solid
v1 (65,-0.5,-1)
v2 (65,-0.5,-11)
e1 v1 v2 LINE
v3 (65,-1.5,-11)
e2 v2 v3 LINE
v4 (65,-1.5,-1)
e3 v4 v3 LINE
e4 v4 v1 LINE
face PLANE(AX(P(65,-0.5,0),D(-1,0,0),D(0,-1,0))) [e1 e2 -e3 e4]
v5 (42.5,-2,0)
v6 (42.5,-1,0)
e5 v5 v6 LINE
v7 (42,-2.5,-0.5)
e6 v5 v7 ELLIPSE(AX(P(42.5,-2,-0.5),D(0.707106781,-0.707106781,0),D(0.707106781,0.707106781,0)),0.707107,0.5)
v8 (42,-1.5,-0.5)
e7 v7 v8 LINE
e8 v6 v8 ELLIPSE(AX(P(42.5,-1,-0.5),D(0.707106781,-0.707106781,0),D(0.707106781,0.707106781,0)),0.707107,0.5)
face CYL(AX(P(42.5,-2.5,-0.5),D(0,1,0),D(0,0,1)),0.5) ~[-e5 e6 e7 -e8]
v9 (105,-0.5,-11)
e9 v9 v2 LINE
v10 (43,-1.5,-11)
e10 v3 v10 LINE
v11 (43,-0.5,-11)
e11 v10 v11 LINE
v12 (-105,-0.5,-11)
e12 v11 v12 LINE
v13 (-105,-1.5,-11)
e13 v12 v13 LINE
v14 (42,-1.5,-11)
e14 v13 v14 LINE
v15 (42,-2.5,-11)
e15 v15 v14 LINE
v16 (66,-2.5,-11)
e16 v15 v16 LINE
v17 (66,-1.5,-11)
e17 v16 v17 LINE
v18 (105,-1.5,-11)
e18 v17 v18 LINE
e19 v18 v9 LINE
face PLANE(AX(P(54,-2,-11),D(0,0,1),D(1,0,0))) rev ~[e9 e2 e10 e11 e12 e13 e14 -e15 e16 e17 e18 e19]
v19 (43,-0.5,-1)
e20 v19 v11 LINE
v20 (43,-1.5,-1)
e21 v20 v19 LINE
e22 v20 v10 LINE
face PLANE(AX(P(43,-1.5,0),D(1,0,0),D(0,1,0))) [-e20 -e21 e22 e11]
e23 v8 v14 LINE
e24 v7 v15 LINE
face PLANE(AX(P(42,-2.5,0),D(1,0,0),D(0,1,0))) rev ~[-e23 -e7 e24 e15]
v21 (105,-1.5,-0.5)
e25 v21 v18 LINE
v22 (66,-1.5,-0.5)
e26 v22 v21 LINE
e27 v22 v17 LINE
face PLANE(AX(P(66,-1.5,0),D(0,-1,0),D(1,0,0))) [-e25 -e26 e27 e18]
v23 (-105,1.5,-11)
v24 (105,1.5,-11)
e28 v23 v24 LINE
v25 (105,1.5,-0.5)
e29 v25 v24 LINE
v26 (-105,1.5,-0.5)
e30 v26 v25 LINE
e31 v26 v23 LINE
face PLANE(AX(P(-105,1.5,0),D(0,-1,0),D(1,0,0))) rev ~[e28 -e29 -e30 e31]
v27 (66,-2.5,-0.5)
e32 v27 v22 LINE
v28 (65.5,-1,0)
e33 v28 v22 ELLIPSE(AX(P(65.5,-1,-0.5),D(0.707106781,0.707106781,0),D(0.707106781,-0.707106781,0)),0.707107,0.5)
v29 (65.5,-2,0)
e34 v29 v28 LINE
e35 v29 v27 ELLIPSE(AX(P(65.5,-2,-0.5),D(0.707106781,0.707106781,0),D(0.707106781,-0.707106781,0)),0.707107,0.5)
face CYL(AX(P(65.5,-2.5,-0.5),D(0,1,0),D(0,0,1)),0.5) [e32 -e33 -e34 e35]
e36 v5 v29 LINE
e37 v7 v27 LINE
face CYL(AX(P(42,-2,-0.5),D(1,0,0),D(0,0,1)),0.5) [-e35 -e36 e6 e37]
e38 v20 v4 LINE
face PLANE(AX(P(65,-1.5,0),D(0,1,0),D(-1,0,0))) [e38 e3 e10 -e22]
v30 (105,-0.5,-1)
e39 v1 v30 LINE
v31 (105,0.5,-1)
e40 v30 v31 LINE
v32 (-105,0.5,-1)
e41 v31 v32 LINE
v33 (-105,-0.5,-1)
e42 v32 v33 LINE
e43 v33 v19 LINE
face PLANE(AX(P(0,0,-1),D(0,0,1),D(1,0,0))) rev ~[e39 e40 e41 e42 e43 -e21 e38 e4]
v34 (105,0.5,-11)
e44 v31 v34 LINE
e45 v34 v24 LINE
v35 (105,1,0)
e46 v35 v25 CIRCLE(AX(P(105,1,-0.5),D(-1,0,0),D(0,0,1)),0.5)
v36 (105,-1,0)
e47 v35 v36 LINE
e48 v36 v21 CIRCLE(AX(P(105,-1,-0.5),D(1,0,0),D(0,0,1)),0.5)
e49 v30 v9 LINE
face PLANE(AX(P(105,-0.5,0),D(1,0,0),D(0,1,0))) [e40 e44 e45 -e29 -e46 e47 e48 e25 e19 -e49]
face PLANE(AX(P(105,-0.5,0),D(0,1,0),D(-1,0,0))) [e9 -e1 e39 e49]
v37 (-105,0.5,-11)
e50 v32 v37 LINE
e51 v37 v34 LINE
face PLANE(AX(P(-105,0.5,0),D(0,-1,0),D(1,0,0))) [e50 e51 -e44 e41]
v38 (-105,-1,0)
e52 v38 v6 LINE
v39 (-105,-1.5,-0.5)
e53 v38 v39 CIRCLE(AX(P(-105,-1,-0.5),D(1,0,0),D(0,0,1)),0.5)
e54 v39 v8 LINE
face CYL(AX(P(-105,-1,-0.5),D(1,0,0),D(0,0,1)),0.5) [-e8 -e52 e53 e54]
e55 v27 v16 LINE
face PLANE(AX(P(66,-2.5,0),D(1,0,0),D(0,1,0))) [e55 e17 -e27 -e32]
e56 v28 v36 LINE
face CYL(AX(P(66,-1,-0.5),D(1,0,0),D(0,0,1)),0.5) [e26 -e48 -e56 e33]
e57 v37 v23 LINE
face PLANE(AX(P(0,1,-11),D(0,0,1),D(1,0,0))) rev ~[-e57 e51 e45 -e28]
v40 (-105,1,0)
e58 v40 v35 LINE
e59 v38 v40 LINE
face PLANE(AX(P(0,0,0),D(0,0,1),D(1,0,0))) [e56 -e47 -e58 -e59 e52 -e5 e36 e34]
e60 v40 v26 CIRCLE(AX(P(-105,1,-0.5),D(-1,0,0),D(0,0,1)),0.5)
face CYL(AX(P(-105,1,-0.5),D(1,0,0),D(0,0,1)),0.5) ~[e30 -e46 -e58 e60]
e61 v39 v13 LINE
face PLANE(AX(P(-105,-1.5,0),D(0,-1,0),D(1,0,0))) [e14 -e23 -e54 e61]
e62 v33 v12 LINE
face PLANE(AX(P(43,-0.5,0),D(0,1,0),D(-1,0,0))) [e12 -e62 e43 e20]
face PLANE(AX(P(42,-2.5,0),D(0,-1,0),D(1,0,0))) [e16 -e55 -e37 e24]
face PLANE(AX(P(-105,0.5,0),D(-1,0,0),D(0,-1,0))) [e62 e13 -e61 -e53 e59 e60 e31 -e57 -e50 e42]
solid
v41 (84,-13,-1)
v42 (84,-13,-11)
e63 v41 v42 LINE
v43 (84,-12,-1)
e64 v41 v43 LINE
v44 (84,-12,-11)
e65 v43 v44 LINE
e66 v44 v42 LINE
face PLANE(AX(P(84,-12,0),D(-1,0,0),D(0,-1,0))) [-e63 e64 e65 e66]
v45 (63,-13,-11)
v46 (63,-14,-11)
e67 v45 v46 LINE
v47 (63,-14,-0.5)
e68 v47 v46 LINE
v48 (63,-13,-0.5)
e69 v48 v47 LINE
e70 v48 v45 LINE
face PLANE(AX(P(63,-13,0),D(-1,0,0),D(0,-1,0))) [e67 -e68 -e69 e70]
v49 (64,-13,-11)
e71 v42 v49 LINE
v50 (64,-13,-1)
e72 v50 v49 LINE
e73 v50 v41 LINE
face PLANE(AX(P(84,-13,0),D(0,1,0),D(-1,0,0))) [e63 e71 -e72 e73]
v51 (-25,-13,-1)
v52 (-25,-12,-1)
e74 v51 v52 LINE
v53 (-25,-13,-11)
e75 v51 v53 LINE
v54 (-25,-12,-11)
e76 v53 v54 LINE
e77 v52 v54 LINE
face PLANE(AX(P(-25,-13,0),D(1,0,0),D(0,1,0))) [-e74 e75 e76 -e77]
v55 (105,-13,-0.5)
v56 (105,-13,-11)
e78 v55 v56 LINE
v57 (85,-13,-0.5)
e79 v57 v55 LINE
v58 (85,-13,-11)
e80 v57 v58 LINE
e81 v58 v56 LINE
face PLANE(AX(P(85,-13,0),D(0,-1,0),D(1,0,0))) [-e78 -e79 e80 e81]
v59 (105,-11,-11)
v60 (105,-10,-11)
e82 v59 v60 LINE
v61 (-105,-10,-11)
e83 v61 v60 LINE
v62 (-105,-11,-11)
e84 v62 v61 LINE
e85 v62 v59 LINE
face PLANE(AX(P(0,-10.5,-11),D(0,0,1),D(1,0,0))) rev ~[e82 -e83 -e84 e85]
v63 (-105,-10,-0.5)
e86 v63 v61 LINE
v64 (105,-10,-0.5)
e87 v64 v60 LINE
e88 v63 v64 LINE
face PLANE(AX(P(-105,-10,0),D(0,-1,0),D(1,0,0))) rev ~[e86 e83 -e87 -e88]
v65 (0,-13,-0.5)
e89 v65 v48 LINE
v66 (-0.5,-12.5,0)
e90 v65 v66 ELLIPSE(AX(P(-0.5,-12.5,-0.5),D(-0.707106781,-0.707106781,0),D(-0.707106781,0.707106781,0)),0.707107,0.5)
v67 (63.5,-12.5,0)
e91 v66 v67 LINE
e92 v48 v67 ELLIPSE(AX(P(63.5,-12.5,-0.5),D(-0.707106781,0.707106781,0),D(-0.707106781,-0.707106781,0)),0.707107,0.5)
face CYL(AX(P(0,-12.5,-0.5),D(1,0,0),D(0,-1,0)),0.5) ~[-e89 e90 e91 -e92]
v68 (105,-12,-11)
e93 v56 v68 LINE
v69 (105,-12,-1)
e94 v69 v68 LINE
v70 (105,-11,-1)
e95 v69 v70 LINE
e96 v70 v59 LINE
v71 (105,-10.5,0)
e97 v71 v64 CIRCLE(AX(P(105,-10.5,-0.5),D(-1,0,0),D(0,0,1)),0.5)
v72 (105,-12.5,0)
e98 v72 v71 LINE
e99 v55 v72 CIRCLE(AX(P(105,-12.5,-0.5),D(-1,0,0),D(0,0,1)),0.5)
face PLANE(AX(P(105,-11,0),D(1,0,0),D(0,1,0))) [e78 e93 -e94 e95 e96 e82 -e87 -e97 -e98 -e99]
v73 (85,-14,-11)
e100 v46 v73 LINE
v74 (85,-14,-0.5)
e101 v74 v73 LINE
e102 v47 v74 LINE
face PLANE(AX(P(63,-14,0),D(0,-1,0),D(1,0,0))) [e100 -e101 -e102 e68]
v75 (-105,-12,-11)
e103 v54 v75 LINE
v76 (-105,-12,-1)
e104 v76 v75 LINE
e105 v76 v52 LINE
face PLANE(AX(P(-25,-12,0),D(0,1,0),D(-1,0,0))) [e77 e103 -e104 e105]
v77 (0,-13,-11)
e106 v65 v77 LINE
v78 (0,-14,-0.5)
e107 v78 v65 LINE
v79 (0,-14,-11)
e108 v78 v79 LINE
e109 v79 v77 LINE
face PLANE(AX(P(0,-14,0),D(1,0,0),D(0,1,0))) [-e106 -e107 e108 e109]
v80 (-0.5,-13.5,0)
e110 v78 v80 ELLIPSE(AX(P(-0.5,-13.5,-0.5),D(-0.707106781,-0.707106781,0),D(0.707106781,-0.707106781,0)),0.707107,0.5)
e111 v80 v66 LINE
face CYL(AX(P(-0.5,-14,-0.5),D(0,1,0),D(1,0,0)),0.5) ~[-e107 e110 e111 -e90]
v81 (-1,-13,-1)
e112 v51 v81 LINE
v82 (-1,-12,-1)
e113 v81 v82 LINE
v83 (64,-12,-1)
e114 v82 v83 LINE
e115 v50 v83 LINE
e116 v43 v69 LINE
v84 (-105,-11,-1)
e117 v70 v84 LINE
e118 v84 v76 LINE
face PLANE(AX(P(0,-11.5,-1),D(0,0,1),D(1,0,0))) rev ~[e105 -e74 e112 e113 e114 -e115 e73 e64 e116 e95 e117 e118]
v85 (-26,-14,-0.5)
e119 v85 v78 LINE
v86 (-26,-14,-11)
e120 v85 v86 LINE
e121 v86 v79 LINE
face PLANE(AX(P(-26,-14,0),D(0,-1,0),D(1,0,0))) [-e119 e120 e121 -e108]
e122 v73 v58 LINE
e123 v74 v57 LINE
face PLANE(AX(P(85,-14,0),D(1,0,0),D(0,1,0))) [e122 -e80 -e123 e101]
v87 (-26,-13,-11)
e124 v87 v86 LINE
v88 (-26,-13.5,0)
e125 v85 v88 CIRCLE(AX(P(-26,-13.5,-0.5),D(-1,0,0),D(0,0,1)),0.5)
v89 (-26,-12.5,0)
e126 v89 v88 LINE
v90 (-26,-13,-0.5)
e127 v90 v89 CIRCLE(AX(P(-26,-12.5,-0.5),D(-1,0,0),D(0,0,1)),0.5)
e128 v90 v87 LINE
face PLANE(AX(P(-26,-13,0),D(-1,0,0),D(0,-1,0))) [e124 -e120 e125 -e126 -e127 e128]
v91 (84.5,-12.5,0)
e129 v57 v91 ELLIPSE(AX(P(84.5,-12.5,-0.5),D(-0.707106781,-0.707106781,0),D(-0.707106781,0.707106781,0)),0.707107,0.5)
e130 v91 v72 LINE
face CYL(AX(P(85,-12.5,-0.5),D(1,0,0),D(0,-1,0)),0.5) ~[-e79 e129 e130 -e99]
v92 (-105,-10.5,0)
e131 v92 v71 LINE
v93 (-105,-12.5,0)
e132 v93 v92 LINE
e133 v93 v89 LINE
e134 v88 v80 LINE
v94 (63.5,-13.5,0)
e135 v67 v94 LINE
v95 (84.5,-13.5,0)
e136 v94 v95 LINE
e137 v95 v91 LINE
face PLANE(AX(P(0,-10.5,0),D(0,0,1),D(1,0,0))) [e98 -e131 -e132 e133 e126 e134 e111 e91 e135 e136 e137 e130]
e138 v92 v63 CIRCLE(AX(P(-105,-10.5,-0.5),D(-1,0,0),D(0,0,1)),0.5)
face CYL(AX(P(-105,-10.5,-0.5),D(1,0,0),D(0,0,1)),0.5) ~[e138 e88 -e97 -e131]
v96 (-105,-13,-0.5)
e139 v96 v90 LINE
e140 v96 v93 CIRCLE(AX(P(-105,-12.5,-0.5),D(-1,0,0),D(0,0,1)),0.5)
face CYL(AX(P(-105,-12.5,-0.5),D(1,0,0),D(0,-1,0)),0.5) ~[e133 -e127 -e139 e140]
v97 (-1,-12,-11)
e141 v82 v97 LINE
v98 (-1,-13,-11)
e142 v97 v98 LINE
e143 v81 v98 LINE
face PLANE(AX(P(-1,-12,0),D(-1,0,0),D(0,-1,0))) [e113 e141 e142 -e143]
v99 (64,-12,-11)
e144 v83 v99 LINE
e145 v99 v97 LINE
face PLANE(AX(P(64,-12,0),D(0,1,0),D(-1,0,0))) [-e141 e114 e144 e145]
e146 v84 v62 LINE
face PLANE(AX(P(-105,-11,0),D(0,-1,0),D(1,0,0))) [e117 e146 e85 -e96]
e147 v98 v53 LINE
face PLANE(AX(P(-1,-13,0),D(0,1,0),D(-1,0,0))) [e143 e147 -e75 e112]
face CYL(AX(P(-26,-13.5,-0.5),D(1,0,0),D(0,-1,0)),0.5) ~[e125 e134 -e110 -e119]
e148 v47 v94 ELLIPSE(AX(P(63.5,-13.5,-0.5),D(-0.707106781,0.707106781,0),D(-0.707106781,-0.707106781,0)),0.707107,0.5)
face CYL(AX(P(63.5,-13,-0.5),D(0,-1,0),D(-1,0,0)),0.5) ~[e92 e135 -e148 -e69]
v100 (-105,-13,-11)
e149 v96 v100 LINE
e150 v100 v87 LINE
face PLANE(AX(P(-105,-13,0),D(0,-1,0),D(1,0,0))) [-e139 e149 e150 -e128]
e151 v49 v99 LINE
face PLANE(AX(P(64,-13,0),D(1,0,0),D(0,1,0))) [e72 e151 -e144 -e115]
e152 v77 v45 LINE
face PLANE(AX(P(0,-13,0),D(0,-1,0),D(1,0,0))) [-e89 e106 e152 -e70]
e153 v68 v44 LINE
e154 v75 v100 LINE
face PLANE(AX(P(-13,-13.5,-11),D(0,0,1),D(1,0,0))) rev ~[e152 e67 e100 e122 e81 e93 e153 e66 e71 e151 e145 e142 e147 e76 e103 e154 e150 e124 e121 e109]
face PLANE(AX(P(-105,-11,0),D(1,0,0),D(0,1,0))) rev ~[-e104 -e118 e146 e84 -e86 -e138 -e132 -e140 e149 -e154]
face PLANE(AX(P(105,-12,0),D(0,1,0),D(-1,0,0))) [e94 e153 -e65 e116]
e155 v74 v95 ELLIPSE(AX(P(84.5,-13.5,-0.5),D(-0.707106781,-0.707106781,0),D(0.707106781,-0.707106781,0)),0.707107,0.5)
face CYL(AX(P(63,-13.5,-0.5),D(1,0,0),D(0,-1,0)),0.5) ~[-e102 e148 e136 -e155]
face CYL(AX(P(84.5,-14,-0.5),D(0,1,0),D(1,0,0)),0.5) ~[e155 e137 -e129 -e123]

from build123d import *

# Parameters (mm, degrees)
F1_W     = 20
F1_H     = 1
F1_W_2   = 24
F2_DEPTH = 1
F1_W_3   = 210
F3_DEPTH = 11
F0_W     = 22
F0_H     = 1
F4_DEPTH = 1
F0_W_2   = 1
F0_W_3   = 210
F5_DEPTH = 11
F6_R     = 0.5
F6_2_R   = 0.5


with BuildPart() as f2:
    # F1 (on Top) → F2 (new body)
    with BuildSketch(Plane.XY):
        Polygon((105, -11), (-105, -11), (-105, -12), (-25, -12), (-1, -12), (64, -12), (84, -12), (105, -12), align=None)
        with Locations((74, -12.5)):
            Rectangle(F1_W, F1_H)
        with Locations((-13, -12.5)):
            Rectangle(F1_W_2, F1_H)
    extrude(amount=-F2_DEPTH)

    # F1 (on Top) → F3 (join)
    with BuildSketch(Plane.XY):
        with Locations((0, -10.5)):
            Rectangle(F1_W_3, F1_H)
        Polygon((-25, -13), (-26, -13), (-26, -14), (0, -14), (0, -13), (-1, -13), align=None)
        Polygon((-25, -12), (-105, -12), (-105, -13), (-26, -13), (-25, -13), align=None)
        Polygon((64, -12), (-1, -12), (-1, -13), (0, -13), (63, -13), (64, -13), align=None)
        Polygon((85, -14), (85, -13), (84, -13), (64, -13), (63, -13), (63, -14), align=None)
        Polygon((105, -13), (105, -12), (84, -12), (84, -13), (85, -13), align=None)
    extrude(amount=-F3_DEPTH)

    # F6
    f6_edges = [f2.edges().sort_by_distance(p)[0] for p in [
        (0, -10, 0),
        (-13, -14, 0),
        (0, -13.5, 0),
        (63, -13.5, 0),
        (74, -14, 0),
        (85, -13.5, 0),
        (95, -13, 0),
        (-65.5, -13, 0),
        (31.5, -13, 0),
    ]]
    fillet(f6_edges, radius=F6_R)


with BuildPart() as f4:
    # F0 (on Top) → F4 (new body)
    with BuildSketch(Plane.XY):
        Polygon((105, 0.5), (-105, 0.5), (-105, -0.5), (43, -0.5), (65, -0.5), (105, -0.5), align=None)
        with Locations((54, -1)):
            Rectangle(F0_W, F0_H)
    extrude(amount=-F4_DEPTH)

    # F0 (on Top) → F5 (join)
    with BuildSketch(Plane.XY):
        with Locations((54, -2)):
            Rectangle(F0_W, F0_H)
        with Locations((42.5, -2)):
            Rectangle(F0_W_2, F0_H)
        Polygon((43, -0.5), (-105, -0.5), (-105, -1.5), (42, -1.5), (43, -1.5), align=None)
        with Locations((65.5, -2)):
            Rectangle(F0_W_2, F0_H)
        Polygon((105, -1.5), (105, -0.5), (65, -0.5), (65, -1.5), (66, -1.5), align=None)
        with Locations((0, 1)):
            Rectangle(F0_W_3, F0_H)
    extrude(amount=-F5_DEPTH)

    # F6#2
    f6_2_edges = [f4.edges().sort_by_distance(p)[0] for p in [
        (0, 1.5, 0),
        (-31.5, -1.5, 0),
        (54, -2.5, 0),
        (85.5, -1.5, 0),
        (42, -2, 0),
        (66, -2, 0),
    ]]
    fillet(f6_2_edges, radius=F6_2_R)


solid = Compound([f2.part, f4.part])
